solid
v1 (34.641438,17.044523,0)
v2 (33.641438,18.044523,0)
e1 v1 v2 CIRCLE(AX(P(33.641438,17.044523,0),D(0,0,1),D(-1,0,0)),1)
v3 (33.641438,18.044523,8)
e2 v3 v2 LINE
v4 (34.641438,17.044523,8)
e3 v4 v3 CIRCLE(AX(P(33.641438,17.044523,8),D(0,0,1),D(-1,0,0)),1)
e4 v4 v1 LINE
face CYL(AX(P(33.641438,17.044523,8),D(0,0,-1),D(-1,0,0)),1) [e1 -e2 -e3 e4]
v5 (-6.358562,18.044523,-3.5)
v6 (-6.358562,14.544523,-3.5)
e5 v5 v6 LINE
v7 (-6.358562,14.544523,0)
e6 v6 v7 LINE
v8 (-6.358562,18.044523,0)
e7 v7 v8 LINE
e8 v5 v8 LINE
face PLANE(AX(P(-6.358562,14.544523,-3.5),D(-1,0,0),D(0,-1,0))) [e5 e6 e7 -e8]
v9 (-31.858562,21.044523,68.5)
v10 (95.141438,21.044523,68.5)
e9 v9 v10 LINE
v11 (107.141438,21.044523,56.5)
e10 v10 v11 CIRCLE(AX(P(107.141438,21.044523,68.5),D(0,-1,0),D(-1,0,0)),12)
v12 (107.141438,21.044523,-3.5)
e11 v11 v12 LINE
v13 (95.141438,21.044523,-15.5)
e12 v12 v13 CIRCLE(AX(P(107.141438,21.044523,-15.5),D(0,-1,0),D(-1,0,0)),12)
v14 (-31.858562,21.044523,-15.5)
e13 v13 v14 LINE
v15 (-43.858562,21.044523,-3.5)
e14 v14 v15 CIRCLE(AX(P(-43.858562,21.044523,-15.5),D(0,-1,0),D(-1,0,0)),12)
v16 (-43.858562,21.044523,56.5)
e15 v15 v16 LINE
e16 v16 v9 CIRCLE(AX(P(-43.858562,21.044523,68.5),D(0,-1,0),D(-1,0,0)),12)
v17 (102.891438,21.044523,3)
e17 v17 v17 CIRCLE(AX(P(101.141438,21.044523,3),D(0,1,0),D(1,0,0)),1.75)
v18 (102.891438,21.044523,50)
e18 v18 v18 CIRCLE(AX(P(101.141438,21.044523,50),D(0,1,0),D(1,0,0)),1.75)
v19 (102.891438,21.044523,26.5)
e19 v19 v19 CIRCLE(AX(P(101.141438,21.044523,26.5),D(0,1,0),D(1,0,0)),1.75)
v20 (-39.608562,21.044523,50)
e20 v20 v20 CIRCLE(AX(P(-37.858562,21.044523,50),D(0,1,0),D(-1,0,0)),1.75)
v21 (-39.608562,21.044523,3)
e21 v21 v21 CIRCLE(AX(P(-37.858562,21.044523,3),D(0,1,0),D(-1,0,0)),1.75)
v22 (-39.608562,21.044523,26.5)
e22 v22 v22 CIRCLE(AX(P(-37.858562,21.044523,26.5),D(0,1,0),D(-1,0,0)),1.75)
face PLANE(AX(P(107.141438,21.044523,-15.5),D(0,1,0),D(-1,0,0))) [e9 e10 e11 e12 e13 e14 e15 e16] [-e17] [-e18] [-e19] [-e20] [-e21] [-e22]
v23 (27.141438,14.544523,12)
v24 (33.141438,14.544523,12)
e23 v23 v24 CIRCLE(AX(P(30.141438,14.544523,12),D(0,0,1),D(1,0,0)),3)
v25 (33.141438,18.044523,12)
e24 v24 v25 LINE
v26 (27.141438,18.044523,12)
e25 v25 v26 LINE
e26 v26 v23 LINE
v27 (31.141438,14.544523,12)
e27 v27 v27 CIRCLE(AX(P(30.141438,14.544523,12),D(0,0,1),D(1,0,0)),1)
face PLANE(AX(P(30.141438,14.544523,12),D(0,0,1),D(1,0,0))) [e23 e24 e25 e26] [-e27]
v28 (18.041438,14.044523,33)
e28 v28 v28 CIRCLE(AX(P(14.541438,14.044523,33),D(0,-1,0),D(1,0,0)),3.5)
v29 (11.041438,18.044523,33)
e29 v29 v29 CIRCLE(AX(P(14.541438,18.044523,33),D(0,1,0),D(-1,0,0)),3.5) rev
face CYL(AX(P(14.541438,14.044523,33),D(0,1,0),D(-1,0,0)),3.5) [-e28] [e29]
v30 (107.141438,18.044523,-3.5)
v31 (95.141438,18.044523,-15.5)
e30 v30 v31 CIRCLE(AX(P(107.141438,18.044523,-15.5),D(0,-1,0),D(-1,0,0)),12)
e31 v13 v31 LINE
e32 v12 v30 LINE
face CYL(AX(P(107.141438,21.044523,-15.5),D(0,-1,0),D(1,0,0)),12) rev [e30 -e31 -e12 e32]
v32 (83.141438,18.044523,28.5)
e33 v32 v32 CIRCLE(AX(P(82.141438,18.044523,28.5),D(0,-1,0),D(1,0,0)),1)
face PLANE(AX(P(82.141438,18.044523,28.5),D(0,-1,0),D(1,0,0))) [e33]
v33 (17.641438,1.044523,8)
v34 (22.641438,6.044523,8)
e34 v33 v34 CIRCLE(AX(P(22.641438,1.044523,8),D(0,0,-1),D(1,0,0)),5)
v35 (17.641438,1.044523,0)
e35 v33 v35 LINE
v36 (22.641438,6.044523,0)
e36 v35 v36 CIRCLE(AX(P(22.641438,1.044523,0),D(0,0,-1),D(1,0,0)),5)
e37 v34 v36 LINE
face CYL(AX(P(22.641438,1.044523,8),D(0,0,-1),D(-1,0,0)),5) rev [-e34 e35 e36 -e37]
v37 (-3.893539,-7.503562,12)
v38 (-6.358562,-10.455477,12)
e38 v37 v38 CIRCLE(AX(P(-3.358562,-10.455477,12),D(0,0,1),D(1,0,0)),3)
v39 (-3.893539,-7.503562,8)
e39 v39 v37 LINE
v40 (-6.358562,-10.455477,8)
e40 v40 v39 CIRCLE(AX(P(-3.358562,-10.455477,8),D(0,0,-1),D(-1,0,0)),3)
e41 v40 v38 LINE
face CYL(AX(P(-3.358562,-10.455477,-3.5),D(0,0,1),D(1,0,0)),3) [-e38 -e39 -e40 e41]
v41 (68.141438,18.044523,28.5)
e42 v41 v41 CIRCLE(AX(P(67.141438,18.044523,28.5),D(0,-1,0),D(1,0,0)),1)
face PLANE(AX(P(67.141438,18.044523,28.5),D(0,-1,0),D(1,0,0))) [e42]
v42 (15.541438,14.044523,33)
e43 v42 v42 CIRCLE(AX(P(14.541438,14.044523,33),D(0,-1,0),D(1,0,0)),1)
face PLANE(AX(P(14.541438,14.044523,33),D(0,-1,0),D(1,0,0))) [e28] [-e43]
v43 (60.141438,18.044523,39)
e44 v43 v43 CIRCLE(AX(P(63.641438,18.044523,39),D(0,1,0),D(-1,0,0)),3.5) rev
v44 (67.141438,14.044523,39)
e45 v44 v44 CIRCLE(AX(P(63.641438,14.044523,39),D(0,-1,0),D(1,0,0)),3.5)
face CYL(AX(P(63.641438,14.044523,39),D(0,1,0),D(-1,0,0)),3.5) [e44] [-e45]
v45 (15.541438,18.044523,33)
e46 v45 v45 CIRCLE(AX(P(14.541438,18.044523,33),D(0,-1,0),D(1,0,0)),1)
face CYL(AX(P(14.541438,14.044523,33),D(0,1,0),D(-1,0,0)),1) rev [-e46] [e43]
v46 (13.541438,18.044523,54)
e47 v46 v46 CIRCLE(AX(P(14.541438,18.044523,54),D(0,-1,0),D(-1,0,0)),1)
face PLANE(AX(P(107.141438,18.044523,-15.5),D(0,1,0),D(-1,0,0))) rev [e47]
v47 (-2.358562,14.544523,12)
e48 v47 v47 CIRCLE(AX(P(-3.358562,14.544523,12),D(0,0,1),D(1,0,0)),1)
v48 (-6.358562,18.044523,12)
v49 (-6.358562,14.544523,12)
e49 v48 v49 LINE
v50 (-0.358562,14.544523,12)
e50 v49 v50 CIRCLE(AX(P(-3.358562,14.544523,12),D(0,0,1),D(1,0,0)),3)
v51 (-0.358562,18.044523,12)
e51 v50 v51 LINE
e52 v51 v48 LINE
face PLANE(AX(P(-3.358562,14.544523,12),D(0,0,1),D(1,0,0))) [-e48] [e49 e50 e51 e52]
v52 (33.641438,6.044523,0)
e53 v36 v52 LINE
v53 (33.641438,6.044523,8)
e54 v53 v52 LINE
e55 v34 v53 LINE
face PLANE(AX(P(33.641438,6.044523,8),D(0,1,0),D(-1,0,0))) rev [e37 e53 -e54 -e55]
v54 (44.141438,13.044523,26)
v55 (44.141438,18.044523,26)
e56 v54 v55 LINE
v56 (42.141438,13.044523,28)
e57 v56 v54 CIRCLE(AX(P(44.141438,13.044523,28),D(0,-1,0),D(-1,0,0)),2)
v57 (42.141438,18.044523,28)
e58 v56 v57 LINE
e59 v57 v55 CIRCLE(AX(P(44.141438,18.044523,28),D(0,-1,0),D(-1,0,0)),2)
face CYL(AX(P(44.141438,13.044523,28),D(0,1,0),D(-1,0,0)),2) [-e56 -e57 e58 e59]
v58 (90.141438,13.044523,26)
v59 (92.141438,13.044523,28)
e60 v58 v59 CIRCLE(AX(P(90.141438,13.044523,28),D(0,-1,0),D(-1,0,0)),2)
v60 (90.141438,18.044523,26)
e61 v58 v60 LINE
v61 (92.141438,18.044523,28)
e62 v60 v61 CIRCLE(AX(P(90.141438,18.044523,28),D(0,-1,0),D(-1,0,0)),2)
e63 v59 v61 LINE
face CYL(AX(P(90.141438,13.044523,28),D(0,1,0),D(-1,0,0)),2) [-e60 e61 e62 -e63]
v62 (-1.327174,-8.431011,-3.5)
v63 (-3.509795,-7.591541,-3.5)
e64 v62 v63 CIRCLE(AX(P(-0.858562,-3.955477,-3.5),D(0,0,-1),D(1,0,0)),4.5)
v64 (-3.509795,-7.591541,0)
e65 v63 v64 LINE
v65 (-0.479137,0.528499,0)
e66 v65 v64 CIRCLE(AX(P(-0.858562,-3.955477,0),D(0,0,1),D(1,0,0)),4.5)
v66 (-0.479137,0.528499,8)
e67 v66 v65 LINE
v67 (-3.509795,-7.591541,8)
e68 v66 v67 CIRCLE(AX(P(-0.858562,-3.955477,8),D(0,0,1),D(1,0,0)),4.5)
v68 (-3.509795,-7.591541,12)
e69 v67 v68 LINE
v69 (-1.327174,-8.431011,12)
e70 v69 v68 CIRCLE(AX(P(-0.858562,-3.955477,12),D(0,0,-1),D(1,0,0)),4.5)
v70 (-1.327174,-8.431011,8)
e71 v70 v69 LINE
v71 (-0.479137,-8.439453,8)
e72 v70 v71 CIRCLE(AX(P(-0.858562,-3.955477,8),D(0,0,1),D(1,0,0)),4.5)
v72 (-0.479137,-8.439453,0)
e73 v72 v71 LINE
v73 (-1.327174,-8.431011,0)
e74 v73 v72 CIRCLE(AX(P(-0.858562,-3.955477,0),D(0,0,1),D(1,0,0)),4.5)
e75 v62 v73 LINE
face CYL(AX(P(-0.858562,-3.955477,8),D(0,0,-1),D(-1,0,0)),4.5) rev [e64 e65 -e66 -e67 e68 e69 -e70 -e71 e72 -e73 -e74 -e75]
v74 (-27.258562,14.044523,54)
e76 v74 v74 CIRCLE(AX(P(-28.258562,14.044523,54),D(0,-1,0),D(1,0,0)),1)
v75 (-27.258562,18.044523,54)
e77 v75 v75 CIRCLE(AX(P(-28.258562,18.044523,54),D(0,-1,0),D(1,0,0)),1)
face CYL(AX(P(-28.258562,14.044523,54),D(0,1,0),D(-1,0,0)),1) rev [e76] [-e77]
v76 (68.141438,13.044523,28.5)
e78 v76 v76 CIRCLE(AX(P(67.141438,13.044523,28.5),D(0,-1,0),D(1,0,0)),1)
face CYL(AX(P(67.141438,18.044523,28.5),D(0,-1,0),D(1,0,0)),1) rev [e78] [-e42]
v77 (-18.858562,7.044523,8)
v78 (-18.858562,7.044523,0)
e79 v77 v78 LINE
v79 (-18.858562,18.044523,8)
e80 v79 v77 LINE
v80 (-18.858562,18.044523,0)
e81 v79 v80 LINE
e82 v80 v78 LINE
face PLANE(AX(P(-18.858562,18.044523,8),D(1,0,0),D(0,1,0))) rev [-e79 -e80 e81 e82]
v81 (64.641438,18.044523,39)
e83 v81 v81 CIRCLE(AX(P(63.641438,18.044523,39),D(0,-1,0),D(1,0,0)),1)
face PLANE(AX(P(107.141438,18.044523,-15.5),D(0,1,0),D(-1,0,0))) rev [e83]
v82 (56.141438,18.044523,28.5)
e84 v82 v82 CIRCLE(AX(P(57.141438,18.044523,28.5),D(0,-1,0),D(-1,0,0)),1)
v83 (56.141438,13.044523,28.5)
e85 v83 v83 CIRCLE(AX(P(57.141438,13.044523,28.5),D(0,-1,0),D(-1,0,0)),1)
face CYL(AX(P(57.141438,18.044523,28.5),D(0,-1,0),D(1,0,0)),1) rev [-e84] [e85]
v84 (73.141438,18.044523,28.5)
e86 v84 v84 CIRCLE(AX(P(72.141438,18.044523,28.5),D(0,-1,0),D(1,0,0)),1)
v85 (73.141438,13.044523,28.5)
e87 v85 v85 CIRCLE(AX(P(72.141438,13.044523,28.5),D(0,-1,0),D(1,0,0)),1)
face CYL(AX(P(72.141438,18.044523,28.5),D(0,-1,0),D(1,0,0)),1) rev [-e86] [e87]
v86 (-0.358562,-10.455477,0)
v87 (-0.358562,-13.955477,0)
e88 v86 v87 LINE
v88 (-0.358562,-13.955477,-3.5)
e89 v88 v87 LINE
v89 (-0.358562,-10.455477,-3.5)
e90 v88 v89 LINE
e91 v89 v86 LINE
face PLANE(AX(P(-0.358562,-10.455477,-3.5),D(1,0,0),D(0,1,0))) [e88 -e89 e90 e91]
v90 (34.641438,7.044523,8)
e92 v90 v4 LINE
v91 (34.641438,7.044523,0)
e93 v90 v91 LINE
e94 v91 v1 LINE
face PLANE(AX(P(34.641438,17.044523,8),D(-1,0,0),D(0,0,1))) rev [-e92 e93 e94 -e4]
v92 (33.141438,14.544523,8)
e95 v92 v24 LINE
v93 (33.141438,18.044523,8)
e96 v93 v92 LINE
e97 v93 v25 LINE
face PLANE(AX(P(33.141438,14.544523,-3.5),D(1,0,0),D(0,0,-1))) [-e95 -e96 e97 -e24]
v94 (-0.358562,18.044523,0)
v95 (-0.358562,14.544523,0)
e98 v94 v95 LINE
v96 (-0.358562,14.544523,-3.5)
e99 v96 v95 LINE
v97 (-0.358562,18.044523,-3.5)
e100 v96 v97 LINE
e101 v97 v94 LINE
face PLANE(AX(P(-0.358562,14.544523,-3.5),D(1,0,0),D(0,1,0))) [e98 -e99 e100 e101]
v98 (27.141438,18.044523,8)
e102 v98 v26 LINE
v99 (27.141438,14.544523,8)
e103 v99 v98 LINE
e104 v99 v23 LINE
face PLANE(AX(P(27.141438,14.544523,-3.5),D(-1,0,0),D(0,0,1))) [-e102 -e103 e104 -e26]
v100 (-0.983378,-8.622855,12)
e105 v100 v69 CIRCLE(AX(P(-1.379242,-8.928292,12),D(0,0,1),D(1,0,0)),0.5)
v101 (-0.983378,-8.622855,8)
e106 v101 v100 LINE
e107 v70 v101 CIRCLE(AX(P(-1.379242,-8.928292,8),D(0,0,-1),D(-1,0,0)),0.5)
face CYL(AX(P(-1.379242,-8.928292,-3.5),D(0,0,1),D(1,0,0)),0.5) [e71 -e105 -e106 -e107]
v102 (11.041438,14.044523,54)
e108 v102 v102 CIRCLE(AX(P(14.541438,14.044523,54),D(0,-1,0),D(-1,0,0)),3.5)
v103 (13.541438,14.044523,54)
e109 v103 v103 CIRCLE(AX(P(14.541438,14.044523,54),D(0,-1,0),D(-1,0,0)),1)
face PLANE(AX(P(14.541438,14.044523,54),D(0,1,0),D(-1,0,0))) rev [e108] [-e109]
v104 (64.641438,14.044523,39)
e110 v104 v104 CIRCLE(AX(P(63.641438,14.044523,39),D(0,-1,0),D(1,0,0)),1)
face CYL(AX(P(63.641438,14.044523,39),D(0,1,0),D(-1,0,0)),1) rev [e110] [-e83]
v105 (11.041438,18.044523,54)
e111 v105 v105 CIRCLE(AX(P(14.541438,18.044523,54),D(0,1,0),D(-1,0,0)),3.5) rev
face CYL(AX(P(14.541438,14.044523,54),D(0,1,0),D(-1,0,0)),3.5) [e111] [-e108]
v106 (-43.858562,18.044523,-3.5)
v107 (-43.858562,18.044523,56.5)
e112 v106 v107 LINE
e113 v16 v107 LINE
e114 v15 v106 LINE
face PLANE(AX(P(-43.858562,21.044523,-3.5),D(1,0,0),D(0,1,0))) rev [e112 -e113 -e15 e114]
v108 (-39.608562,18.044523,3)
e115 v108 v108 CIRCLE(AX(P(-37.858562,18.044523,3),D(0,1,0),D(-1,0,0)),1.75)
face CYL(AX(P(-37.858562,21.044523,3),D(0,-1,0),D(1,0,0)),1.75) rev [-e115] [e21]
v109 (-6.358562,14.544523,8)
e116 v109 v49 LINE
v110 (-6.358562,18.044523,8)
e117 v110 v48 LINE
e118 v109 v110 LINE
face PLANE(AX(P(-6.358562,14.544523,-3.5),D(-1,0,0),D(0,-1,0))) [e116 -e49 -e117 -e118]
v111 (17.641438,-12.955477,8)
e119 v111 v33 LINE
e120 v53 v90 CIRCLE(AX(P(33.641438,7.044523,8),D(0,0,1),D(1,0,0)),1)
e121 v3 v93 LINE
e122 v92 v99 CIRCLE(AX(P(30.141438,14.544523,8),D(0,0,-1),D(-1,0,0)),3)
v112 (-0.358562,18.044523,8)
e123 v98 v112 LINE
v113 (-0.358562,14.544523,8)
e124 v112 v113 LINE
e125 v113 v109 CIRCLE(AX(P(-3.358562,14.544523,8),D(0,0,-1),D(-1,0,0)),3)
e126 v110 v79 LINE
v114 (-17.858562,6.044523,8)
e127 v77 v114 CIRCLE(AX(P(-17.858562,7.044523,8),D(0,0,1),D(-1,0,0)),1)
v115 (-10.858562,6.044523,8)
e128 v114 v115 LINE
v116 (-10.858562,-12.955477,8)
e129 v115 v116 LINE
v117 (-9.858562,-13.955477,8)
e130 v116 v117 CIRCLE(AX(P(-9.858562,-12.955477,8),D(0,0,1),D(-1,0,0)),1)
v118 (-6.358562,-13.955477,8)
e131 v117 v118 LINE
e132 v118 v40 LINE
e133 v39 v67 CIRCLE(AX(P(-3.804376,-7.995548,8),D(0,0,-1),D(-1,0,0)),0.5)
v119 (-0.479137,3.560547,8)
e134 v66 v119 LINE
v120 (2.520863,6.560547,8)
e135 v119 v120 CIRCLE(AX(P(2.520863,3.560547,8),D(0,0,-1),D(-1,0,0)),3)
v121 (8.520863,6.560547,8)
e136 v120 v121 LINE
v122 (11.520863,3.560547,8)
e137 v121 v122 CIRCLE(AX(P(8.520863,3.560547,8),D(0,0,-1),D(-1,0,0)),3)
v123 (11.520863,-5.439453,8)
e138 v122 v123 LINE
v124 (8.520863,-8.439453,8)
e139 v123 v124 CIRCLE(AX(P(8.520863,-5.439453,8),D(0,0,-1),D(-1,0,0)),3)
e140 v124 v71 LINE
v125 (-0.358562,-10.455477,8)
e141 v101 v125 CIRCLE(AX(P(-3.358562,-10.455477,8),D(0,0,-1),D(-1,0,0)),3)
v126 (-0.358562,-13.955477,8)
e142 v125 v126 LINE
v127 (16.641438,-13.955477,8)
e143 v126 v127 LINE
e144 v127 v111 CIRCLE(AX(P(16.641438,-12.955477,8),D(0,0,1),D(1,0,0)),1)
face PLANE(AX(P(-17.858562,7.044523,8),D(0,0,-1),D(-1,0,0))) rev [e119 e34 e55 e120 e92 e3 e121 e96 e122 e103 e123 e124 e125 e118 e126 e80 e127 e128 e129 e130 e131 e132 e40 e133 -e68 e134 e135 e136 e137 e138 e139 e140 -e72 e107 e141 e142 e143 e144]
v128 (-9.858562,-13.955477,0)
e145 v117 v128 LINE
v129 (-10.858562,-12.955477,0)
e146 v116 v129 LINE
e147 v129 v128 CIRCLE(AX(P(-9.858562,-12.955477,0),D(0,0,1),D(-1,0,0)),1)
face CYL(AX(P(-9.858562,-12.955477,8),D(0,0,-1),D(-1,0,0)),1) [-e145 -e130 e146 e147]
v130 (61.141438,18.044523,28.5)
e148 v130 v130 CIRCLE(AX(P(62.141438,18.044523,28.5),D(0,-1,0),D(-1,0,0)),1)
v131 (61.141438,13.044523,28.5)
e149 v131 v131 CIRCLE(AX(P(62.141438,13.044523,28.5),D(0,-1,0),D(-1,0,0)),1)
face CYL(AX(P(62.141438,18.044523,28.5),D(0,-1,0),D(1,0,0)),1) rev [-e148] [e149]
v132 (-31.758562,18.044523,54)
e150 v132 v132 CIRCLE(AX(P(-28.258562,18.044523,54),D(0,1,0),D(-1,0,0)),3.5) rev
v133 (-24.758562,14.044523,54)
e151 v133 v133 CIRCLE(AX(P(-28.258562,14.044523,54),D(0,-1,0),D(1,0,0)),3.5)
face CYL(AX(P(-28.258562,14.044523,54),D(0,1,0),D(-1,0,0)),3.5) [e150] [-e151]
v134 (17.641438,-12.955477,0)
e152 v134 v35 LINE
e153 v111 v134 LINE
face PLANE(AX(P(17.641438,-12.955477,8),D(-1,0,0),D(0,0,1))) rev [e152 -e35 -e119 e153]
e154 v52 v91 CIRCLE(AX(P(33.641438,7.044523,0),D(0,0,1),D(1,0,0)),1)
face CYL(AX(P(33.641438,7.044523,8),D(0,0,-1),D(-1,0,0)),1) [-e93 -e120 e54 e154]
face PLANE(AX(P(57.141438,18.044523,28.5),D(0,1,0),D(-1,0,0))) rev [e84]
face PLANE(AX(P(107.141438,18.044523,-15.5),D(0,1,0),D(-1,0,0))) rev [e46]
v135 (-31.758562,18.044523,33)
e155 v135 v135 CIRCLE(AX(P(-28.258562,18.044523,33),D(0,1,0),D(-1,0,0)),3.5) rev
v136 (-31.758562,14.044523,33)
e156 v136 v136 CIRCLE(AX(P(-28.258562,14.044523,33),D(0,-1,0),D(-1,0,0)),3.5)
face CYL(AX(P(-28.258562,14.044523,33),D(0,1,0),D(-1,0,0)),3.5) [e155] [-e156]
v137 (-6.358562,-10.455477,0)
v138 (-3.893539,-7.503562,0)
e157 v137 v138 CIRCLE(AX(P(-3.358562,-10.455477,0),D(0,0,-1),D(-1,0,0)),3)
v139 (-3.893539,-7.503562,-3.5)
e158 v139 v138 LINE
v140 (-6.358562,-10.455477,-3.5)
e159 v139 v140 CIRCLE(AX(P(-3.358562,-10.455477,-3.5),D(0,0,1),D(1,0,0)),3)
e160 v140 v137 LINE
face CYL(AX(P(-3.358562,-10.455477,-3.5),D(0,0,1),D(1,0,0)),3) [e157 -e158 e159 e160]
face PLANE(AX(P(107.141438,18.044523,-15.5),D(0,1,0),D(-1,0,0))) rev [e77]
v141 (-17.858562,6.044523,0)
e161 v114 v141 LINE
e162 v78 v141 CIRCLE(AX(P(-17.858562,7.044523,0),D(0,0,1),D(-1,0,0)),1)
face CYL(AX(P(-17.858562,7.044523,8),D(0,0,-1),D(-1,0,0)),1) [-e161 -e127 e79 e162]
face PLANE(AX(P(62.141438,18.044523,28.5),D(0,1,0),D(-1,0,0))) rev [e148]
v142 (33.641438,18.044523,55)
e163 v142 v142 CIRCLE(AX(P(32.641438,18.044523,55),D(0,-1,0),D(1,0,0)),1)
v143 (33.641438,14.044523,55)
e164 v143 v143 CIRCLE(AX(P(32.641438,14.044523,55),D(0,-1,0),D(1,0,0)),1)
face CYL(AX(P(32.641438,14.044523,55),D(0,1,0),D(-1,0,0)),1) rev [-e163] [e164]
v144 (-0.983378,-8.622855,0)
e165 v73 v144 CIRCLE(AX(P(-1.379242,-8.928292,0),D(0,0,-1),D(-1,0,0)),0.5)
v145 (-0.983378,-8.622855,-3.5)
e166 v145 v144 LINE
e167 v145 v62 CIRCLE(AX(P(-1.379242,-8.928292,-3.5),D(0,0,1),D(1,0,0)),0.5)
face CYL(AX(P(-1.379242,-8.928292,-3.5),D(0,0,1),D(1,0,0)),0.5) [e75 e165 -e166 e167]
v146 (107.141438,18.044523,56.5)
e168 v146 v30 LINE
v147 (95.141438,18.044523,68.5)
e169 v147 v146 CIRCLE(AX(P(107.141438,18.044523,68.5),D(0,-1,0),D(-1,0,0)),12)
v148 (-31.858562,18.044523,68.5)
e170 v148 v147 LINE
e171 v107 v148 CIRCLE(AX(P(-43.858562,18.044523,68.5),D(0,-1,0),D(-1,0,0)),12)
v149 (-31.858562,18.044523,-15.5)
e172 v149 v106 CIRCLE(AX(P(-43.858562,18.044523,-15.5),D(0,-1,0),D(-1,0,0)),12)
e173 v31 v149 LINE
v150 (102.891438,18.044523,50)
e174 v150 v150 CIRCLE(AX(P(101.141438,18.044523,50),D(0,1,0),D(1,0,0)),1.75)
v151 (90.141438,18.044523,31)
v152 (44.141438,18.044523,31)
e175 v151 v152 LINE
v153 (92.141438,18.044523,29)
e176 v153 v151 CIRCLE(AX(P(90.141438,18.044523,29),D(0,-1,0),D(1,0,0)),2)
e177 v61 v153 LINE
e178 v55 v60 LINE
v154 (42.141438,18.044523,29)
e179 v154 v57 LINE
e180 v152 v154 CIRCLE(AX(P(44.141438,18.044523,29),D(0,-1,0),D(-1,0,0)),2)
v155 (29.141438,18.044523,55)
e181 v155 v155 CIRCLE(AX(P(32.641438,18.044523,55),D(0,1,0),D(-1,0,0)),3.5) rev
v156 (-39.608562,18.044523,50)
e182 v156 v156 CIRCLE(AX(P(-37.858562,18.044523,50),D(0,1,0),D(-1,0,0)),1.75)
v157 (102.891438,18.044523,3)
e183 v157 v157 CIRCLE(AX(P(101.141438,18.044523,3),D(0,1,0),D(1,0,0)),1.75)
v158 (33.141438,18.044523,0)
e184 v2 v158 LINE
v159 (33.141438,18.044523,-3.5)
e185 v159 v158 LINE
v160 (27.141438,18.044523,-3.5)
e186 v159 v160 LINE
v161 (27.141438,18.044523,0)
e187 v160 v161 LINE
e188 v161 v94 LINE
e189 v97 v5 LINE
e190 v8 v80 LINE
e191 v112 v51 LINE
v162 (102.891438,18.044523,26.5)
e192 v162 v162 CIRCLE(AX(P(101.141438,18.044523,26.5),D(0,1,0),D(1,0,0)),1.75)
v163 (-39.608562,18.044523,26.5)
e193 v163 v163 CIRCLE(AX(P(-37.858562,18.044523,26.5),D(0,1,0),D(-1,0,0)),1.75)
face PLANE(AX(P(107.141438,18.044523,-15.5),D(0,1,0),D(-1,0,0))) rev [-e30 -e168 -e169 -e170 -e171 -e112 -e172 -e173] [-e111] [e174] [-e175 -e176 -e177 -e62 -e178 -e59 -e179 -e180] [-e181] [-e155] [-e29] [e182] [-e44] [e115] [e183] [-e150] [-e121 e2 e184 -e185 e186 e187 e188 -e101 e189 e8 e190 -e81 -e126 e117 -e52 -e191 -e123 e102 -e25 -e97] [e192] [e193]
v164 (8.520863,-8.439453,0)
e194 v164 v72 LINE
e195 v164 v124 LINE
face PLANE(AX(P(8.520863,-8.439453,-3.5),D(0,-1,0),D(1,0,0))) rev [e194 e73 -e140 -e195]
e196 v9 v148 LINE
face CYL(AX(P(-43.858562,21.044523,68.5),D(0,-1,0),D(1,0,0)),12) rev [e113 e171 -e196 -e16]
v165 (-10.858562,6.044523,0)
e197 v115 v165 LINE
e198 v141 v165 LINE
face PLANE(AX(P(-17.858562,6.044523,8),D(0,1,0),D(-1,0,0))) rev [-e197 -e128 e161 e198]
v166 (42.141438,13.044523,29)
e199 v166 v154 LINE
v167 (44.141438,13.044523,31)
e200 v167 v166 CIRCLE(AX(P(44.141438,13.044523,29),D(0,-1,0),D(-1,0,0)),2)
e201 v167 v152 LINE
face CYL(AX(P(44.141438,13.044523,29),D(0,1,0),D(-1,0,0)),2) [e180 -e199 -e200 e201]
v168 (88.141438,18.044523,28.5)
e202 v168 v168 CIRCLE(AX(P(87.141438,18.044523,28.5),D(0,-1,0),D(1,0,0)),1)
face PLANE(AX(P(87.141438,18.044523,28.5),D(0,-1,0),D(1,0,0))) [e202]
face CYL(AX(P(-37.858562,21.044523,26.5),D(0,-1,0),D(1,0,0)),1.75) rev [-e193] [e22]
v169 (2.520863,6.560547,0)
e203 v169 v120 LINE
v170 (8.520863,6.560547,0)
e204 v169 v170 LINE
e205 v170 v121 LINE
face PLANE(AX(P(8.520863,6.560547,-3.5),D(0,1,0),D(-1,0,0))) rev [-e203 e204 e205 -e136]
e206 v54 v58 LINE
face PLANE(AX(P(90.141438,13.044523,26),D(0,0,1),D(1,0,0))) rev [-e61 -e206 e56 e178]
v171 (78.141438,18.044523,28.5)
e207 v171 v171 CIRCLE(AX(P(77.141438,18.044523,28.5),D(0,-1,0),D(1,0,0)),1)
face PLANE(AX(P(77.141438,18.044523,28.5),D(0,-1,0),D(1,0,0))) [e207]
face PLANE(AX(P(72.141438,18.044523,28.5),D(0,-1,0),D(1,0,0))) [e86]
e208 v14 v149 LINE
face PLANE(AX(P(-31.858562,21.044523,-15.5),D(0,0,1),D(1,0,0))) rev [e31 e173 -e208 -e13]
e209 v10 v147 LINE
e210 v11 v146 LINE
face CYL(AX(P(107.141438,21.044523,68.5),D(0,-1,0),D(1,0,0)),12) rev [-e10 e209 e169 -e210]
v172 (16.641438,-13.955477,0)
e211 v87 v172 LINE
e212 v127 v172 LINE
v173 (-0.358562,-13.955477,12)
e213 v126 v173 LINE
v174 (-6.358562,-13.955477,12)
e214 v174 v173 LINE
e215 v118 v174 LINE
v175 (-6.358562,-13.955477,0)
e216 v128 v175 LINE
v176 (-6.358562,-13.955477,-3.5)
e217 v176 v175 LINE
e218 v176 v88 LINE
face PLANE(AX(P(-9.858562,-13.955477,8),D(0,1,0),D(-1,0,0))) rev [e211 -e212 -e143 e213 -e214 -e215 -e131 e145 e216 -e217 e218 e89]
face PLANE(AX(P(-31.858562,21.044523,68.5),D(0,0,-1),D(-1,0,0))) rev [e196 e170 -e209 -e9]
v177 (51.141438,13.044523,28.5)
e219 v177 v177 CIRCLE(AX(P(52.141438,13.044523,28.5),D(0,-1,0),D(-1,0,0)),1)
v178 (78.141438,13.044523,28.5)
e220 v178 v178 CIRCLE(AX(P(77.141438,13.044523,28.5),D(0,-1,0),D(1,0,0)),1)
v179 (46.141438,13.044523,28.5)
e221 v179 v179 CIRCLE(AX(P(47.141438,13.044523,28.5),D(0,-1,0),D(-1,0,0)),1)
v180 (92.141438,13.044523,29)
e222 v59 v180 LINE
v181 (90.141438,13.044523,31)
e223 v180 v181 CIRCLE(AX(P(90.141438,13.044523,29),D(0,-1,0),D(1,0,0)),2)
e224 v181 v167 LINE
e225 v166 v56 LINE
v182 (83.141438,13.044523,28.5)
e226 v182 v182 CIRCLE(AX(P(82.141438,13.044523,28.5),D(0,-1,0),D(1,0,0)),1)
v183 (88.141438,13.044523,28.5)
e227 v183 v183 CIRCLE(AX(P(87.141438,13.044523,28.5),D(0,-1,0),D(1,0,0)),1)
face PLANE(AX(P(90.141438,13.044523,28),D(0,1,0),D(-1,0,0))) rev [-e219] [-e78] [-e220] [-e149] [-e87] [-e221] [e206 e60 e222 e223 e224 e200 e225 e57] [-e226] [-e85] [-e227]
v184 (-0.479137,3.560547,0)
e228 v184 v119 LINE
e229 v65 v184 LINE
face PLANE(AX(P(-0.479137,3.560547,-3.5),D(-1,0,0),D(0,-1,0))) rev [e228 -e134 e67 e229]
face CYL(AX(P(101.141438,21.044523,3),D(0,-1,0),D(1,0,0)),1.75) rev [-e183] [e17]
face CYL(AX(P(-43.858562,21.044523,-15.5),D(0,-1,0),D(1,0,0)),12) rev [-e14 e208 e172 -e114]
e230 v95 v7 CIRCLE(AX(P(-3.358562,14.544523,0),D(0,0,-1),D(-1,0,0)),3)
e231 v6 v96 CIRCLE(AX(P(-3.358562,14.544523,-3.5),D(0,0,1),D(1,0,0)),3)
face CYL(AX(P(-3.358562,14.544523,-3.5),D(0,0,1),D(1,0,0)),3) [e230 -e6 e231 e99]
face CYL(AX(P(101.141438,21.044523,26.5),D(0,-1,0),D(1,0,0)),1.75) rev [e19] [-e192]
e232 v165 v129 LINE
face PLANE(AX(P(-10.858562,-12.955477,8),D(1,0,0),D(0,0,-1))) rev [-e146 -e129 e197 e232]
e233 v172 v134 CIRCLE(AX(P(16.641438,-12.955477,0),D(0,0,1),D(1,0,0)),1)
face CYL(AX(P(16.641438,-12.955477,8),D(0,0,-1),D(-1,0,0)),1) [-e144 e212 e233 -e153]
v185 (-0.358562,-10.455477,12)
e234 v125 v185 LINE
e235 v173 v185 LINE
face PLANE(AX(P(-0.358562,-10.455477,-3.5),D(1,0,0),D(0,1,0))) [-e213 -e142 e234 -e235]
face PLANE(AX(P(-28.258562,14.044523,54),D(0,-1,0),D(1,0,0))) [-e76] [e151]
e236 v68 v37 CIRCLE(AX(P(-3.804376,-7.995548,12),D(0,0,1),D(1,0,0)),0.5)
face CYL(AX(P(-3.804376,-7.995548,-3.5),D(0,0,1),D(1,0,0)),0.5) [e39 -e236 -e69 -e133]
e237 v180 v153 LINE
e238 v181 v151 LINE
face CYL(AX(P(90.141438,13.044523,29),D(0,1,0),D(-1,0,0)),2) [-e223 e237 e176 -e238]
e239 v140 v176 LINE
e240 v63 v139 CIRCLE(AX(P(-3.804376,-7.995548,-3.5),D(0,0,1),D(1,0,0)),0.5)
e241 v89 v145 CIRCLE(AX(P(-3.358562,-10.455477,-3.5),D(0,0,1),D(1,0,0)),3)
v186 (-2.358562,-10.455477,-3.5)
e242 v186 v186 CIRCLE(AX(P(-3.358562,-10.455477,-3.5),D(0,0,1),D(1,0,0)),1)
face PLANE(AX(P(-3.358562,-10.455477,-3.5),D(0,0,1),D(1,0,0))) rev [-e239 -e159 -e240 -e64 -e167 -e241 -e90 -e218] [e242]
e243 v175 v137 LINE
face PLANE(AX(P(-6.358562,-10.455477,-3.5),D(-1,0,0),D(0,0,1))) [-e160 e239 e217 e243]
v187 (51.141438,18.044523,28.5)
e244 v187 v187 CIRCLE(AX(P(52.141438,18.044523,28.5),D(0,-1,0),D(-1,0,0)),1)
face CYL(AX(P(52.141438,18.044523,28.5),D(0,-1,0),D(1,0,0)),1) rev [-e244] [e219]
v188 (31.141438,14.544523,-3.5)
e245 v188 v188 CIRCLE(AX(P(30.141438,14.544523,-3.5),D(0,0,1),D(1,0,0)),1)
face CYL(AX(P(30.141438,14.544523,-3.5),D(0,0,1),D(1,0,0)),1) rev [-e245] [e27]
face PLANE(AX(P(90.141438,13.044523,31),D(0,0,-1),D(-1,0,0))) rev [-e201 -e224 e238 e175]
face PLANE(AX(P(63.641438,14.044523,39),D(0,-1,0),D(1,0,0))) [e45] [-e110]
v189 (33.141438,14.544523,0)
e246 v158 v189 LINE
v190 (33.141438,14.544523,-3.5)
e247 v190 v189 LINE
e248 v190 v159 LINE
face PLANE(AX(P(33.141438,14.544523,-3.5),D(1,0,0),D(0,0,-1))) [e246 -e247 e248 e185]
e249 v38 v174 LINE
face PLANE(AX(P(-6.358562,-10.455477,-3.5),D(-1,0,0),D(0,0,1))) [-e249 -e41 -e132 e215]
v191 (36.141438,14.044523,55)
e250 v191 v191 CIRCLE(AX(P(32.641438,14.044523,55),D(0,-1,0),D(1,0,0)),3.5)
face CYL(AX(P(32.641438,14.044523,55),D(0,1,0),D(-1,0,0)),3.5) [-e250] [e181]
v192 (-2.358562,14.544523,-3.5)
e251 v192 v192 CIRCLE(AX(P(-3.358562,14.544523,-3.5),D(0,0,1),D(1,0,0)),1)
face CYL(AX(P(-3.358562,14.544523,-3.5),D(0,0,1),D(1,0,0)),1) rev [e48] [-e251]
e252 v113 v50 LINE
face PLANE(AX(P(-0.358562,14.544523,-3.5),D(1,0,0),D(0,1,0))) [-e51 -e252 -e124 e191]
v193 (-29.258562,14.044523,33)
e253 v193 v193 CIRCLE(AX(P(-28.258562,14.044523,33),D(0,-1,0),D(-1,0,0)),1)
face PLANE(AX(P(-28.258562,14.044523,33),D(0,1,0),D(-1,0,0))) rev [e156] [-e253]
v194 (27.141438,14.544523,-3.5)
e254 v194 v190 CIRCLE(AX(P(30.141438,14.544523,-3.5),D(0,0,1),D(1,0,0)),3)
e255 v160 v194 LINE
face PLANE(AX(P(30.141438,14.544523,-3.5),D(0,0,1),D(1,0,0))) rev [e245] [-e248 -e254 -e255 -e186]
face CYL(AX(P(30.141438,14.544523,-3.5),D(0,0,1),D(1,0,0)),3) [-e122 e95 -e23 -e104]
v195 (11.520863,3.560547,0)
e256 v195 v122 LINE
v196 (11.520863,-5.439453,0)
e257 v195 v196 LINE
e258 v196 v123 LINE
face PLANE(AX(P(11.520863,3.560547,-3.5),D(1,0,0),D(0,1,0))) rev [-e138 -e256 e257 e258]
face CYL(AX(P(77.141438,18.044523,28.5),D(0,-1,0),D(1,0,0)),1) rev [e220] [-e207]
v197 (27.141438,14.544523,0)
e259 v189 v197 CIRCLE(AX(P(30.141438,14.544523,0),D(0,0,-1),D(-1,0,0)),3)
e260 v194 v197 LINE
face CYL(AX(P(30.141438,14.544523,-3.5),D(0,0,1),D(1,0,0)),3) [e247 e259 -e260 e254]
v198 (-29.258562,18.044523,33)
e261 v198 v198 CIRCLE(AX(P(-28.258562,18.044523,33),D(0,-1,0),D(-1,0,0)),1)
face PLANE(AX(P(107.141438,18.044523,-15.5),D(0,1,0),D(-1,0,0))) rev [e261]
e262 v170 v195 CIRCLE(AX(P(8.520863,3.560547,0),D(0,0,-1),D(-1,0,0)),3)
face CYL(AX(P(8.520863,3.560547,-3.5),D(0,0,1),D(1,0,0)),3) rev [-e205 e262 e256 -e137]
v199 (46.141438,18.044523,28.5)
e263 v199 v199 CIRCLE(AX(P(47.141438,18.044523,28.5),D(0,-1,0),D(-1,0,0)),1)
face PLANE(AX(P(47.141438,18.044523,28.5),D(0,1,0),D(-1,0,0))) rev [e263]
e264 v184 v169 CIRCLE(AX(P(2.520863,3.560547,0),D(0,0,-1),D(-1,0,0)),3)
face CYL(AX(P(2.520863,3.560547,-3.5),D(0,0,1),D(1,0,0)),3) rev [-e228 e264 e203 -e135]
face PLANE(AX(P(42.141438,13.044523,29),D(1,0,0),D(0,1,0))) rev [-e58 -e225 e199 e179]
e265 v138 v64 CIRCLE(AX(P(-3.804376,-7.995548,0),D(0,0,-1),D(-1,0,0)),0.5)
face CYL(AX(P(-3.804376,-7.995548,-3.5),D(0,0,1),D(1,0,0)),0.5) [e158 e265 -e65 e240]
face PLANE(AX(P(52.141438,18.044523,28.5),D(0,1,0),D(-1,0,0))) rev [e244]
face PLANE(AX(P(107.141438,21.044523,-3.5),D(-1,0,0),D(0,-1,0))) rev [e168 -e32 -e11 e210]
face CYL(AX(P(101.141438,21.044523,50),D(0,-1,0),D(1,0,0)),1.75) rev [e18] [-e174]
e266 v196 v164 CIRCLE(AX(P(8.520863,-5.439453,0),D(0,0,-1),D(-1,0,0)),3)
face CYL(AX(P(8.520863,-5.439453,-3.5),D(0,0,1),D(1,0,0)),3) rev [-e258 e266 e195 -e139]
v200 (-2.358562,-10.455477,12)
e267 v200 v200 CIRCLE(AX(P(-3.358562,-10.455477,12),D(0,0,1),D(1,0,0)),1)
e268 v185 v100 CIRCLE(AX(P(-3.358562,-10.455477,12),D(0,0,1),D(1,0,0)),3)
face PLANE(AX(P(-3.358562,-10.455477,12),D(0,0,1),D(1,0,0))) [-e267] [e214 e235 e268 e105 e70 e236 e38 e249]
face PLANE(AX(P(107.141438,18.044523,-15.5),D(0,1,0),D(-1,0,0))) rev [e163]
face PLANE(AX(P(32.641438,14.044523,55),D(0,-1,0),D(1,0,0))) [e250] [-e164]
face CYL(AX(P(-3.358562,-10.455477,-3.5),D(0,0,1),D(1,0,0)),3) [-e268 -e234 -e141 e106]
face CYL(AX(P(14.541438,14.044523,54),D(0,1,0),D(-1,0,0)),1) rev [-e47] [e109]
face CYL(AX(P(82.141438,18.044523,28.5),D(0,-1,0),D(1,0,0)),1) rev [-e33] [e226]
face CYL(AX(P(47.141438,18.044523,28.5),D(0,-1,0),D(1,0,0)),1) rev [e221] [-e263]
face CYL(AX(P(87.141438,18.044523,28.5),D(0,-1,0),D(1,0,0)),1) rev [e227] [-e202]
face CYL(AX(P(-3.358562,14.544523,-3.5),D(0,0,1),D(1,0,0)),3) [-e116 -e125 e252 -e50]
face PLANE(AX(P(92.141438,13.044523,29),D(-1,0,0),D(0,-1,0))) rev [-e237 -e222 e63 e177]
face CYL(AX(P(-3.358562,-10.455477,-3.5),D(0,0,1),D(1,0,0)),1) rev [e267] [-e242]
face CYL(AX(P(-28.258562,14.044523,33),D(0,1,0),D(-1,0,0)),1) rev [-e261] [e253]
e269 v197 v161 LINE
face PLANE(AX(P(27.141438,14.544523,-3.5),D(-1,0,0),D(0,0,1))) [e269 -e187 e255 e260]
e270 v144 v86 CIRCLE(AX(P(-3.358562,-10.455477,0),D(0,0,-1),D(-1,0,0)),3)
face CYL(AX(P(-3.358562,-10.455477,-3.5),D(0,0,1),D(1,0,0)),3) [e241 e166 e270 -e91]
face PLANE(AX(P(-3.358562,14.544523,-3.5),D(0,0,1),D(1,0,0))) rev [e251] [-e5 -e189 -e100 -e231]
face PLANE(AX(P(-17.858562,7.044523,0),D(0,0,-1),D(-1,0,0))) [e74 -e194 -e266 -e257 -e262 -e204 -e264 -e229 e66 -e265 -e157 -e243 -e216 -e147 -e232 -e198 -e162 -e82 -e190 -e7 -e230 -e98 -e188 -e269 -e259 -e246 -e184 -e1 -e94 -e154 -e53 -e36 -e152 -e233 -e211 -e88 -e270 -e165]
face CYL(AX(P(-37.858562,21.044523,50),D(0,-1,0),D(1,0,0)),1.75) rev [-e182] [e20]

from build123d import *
from build123d.topology import SkipClean

# Parameters (mm, degrees)
SKETCH_2_R               = 4.5
EXTRUDE_1_DEPTH          = 8
EXTRUDE_2_DEPTH          = 4
EXTRUDE_2_DEPTH_BACK     = 11.5
CUT_EXTRUDE_1_DEPTH      = 41.717122437
CUT_EXTRUDE_1_DEPTH_BACK = 41.717122437
CUT_EXTRUDE_2_DEPTH      = 41.717122437
CUT_EXTRUDE_2_DEPTH_BACK = 41.717122437
SKETCH_6_R               = 1
SKETCH_7_R               = 1.75
EXTRUDE_3_DEPTH          = 3
EXTRUDE_4_DEPTH          = 5
SKETCH_9_R               = 1
CUT_EXTRUDE_3_DEPTH      = 5
SKETCH_10_R              = 3.5
SKETCH_10_R_2            = 1
EXTRUDE_5_DEPTH          = 4


with BuildPart() as part:
    # Эскиз2 → Бобышка-Вытянуть1 (new body)
    with BuildSketch(Plane.XY):
        with BuildLine():
            Line((-18.858561718, 18.044523082), (33.641438282, 18.044523082))
            ThreePointArc((33.641438282, 18.044523082), (34.348545063, 17.751629864), (34.641438282, 17.044523082))
            Line((34.641438282, 17.044523082), (34.641438282, 7.044523082))
            ThreePointArc((34.641438282, 7.044523082), (34.348545063, 6.337416301), (33.641438282, 6.044523082))
            Line((33.641438282, 6.044523082), (22.641438282, 6.044523082))
            ThreePointArc((22.641438282, 6.044523082), (19.105904376, 4.580056988), (17.641438282, 1.044523082))
            Line((17.641438282, 1.044523082), (17.641438282, -12.955476918))
            ThreePointArc((17.641438282, -12.955476918), (17.348545063, -13.662583699), (16.641438282, -13.955476918))
            Line((16.641438282, -13.955476918), (-9.858561718, -13.955476918))
            ThreePointArc((-9.858561718, -13.955476918), (-10.565668499, -13.662583699), (-10.858561718, -12.955476918))
            Line((-10.858561718, -12.955476918), (-10.858561718, 6.044523082))
            Line((-10.858561718, 6.044523082), (-17.858561718, 6.044523082))
            ThreePointArc((-17.858561718, 6.044523082), (-18.565668499, 6.337416301), (-18.858561718, 7.044523082))
            Line((-18.858561718, 7.044523082), (-18.858561718, 18.044523082))
        make_face()
        with Locations((-0.858561718, -3.955476918)):
            Circle(SKETCH_2_R, mode=Mode.SUBTRACT)
    extrude(amount=EXTRUDE_1_DEPTH)

    # Эскиз3 → Бобышка-Вытянуть2 (add, two sides: drawn at the far end of the back side and taken through both)
    with SkipClean():  # the faces are left unmerged after this step: merging them gives an invalid solid
        with BuildSketch(Plane.XY.offset(8).offset(-EXTRUDE_2_DEPTH_BACK)):
            with BuildLine():
                Line((27.141438282, 14.544523082), (27.141438282, 18.044523082))
                Line((27.141438282, 18.044523082), (33.141438282, 18.044523082))
                Line((33.141438282, 18.044523082), (33.141438282, 14.544523082))
                ThreePointArc((33.141438282, 14.544523082), (30.141438282, 11.544523082), (27.141438282, 14.544523082))
            make_face()
            with BuildLine():
                Line((-0.358561718, 14.544523082), (-0.358561718, 18.044523082))
                Line((-0.358561718, 18.044523082), (-6.358561718, 18.044523082))
                Line((-6.358561718, 18.044523082), (-6.358561718, 14.544523082))
                ThreePointArc((-6.358561718, 14.544523082), (-3.358561718, 11.544523082), (-0.358561718, 14.544523082))
            make_face()
            with BuildLine():
                Line((-6.358561718, -10.455476918), (-6.358561718, -13.955476918))
                Line((-6.358561718, -13.955476918), (-0.358561718, -13.955476918))
                Line((-0.358561718, -13.955476918), (-0.358561718, -10.455476918))
                ThreePointArc((-0.358561718, -10.455476918), (-0.519059003, -9.487373446), (-0.983377938, -8.622855294))
                ThreePointArc((-0.983377938, -8.622855294), (-1.135599023, -8.491670945), (-1.327173883, -8.4310107))
                ThreePointArc((-1.327173883, -8.4310107), (-2.473967575, -8.155532145), (-3.509794913, -7.591541073))
                ThreePointArc((-3.509794913, -7.591541073), (-3.692643427, -7.508192328), (-3.893539312, -7.503562458))
                ThreePointArc((-3.893539312, -7.503562458), (-5.661270208, -8.532579726), (-6.358561718, -10.455476918))
            make_face()
        extrude(amount=EXTRUDE_2_DEPTH + EXTRUDE_2_DEPTH_BACK)
    add(part.part.scale(1), mode=Mode.REPLACE)  # the faces are merged on a copy

    # Эскиз5 → Вырез-Вытянуть1 (cut, two sides: drawn at the far end of the back side and taken through both)
    with BuildSketch(Plane.XY.offset(8).offset(-CUT_EXTRUDE_1_DEPTH_BACK)):
        with BuildLine():
            Line((8.520862779, 6.560547497), (2.520862779, 6.560547497))
            ThreePointArc((2.520862779, 6.560547497), (0.399542436, 5.681867841), (-0.479137221, 3.560547497))
            Line((-0.479137221, 3.560547497), (-0.479137221, -8.439452503))
            Line((-0.479137221, -8.439452503), (8.520862779, -8.439452503))
            ThreePointArc((8.520862779, -8.439452503), (10.642183123, -7.560772847), (11.520862779, -5.439452503))
            Line((11.520862779, -5.439452503), (11.520862779, 3.560547497))
            ThreePointArc((11.520862779, 3.560547497), (10.642183123, 5.681867841), (8.520862779, 6.560547497))
        make_face()
    extrude(amount=CUT_EXTRUDE_1_DEPTH + CUT_EXTRUDE_1_DEPTH_BACK, mode=Mode.SUBTRACT)

    # Эскиз6 → Вырез-Вытянуть2 (cut, two sides: drawn at the far end of the back side and taken through both)
    with BuildSketch(Plane.XY.offset(8).offset(-CUT_EXTRUDE_2_DEPTH_BACK)):
        with Locations((-3.358561718, 14.544523082)):
            Circle(SKETCH_6_R)
        with Locations((30.141438282, 14.544523082)):
            Circle(SKETCH_6_R)
        with Locations((-3.358561718, -10.455476918)):
            Circle(SKETCH_6_R)
    extrude(amount=CUT_EXTRUDE_2_DEPTH + CUT_EXTRUDE_2_DEPTH_BACK, mode=Mode.SUBTRACT)

    # Эскиз7 → Бобышка-Вытянуть3 (add)
    with BuildSketch(Plane(origin=(0, 18.044523082, 0), x_dir=(1, 0, 0), z_dir=(0, 1, 0))):
        with BuildLine():
            Line((-31.858561718, 15.5), (95.141438282, 15.5))
            ThreePointArc((95.141438282, 15.5), (98.656156908, 7.014718626), (107.141438282, 3.5))
            Line((107.141438282, 3.5), (107.141438282, -56.5))
            ThreePointArc((107.141438282, -56.5), (98.656156908, -60.014718626), (95.141438282, -68.5))
            Line((95.141438282, -68.5), (-31.858561718, -68.5))
            ThreePointArc((-31.858561718, -68.5), (-35.373280344, -60.014718626), (-43.858561718, -56.5))
            Line((-43.858561718, -56.5), (-43.858561718, 3.5))
            ThreePointArc((-43.858561718, 3.5), (-35.373280344, 7.014718626), (-31.858561718, 15.5))
        make_face()
        with Locations((-37.858561718, -26.5)):
            Circle(SKETCH_7_R, mode=Mode.SUBTRACT)
        with Locations((-37.858561718, -50)):
            Circle(SKETCH_7_R, mode=Mode.SUBTRACT)
        with Locations((-37.858561718, -3)):
            Circle(SKETCH_7_R, mode=Mode.SUBTRACT)
        with Locations((101.141438282, -50)):
            Circle(SKETCH_7_R, mode=Mode.SUBTRACT)
        with Locations((101.141438282, -26.5)):
            Circle(SKETCH_7_R, mode=Mode.SUBTRACT)
        with Locations((101.141438282, -3)):
            Circle(SKETCH_7_R, mode=Mode.SUBTRACT)
    extrude(amount=EXTRUDE_3_DEPTH)

    # Эскиз8 → Бобышка-Вытянуть4 (add)
    with BuildSketch(Plane.XZ.offset(-18.044523082)):
        with BuildLine():
            Line((90.141438282, 31), (44.141438282, 31))
            ThreePointArc((44.141438282, 31), (42.72722472, 30.414213562), (42.141438282, 29))
            Line((42.141438282, 29), (42.141438282, 28))
            ThreePointArc((42.141438282, 28), (42.72722472, 26.585786438), (44.141438282, 26))
            Line((44.141438282, 26), (90.141438282, 26))
            ThreePointArc((90.141438282, 26), (91.555651845, 26.585786438), (92.141438282, 28))
            Line((92.141438282, 28), (92.141438282, 29))
            ThreePointArc((92.141438282, 29), (91.555651845, 30.414213562), (90.141438282, 31))
        make_face()
    extrude(amount=EXTRUDE_4_DEPTH)

    # Эскиз9 → Вырез-Вытянуть3 (cut)
    with BuildSketch(Plane.XZ.offset(-13.044523082)):
        with Locations((67.141438282, 28.5)):
            Circle(SKETCH_9_R)
        with Locations((72.141438282, 28.5)):
            Circle(SKETCH_9_R)
        with Locations((77.141438282, 28.5)):
            Circle(SKETCH_9_R)
        with Locations((82.141438282, 28.5)):
            Circle(SKETCH_9_R)
        with Locations((87.141438282, 28.5)):
            Circle(SKETCH_9_R)
        with Locations((47.141438282, 28.5)):
            Circle(SKETCH_9_R)
        with Locations((52.141438282, 28.5)):
            Circle(SKETCH_9_R)
        with Locations((57.141438282, 28.5)):
            Circle(SKETCH_9_R)
        with Locations((62.141438282, 28.5)):
            Circle(SKETCH_9_R)
    extrude(amount=-CUT_EXTRUDE_3_DEPTH, mode=Mode.SUBTRACT)

    # Эскиз10 → Бобышка-Вытянуть5 (add)
    # profile 1 of 6: a face of its own
    with BuildSketch(Plane.XZ.offset(-18.044523082)):
        with Locations((32.641438282, 55)):
            Circle(SKETCH_10_R)
        with Locations((32.641438282, 55)):
            Circle(SKETCH_10_R_2, mode=Mode.SUBTRACT)
    # profile 2 of 6: a face of its own
    with BuildSketch(Plane.XZ.offset(-18.044523082)):
        with Locations((63.641438282, 39)):
            Circle(SKETCH_10_R)
        with Locations((63.641438282, 39)):
            Circle(SKETCH_10_R_2, mode=Mode.SUBTRACT)
    # profile 3 of 6: a face of its own
    with BuildSketch(Plane.XZ.offset(-18.044523082)):
        with Locations((-28.258561718, 54)):
            Circle(SKETCH_10_R)
        with Locations((-28.258561718, 54)):
            Circle(SKETCH_10_R_2, mode=Mode.SUBTRACT)
    # profile 4 of 6: a face of its own
    with BuildSketch(Plane.XZ.offset(-18.044523082)):
        with Locations((14.541438282, 54)):
            Circle(SKETCH_10_R)
        with Locations((14.541438282, 54)):
            Circle(SKETCH_10_R_2, mode=Mode.SUBTRACT)
    # profile 5 of 6: a face of its own
    with BuildSketch(Plane.XZ.offset(-18.044523082)):
        with Locations((14.541438282, 33)):
            Circle(SKETCH_10_R)
        with Locations((14.541438282, 33)):
            Circle(SKETCH_10_R_2, mode=Mode.SUBTRACT)
    # profile 6 of 6: a face of its own
    with BuildSketch(Plane.XZ.offset(-18.044523082)):
        with Locations((-28.258561718, 33)):
            Circle(SKETCH_10_R)
        with Locations((-28.258561718, 33)):
            Circle(SKETCH_10_R_2, mode=Mode.SUBTRACT)
    extrude(amount=EXTRUDE_5_DEPTH)


solid = part.part
